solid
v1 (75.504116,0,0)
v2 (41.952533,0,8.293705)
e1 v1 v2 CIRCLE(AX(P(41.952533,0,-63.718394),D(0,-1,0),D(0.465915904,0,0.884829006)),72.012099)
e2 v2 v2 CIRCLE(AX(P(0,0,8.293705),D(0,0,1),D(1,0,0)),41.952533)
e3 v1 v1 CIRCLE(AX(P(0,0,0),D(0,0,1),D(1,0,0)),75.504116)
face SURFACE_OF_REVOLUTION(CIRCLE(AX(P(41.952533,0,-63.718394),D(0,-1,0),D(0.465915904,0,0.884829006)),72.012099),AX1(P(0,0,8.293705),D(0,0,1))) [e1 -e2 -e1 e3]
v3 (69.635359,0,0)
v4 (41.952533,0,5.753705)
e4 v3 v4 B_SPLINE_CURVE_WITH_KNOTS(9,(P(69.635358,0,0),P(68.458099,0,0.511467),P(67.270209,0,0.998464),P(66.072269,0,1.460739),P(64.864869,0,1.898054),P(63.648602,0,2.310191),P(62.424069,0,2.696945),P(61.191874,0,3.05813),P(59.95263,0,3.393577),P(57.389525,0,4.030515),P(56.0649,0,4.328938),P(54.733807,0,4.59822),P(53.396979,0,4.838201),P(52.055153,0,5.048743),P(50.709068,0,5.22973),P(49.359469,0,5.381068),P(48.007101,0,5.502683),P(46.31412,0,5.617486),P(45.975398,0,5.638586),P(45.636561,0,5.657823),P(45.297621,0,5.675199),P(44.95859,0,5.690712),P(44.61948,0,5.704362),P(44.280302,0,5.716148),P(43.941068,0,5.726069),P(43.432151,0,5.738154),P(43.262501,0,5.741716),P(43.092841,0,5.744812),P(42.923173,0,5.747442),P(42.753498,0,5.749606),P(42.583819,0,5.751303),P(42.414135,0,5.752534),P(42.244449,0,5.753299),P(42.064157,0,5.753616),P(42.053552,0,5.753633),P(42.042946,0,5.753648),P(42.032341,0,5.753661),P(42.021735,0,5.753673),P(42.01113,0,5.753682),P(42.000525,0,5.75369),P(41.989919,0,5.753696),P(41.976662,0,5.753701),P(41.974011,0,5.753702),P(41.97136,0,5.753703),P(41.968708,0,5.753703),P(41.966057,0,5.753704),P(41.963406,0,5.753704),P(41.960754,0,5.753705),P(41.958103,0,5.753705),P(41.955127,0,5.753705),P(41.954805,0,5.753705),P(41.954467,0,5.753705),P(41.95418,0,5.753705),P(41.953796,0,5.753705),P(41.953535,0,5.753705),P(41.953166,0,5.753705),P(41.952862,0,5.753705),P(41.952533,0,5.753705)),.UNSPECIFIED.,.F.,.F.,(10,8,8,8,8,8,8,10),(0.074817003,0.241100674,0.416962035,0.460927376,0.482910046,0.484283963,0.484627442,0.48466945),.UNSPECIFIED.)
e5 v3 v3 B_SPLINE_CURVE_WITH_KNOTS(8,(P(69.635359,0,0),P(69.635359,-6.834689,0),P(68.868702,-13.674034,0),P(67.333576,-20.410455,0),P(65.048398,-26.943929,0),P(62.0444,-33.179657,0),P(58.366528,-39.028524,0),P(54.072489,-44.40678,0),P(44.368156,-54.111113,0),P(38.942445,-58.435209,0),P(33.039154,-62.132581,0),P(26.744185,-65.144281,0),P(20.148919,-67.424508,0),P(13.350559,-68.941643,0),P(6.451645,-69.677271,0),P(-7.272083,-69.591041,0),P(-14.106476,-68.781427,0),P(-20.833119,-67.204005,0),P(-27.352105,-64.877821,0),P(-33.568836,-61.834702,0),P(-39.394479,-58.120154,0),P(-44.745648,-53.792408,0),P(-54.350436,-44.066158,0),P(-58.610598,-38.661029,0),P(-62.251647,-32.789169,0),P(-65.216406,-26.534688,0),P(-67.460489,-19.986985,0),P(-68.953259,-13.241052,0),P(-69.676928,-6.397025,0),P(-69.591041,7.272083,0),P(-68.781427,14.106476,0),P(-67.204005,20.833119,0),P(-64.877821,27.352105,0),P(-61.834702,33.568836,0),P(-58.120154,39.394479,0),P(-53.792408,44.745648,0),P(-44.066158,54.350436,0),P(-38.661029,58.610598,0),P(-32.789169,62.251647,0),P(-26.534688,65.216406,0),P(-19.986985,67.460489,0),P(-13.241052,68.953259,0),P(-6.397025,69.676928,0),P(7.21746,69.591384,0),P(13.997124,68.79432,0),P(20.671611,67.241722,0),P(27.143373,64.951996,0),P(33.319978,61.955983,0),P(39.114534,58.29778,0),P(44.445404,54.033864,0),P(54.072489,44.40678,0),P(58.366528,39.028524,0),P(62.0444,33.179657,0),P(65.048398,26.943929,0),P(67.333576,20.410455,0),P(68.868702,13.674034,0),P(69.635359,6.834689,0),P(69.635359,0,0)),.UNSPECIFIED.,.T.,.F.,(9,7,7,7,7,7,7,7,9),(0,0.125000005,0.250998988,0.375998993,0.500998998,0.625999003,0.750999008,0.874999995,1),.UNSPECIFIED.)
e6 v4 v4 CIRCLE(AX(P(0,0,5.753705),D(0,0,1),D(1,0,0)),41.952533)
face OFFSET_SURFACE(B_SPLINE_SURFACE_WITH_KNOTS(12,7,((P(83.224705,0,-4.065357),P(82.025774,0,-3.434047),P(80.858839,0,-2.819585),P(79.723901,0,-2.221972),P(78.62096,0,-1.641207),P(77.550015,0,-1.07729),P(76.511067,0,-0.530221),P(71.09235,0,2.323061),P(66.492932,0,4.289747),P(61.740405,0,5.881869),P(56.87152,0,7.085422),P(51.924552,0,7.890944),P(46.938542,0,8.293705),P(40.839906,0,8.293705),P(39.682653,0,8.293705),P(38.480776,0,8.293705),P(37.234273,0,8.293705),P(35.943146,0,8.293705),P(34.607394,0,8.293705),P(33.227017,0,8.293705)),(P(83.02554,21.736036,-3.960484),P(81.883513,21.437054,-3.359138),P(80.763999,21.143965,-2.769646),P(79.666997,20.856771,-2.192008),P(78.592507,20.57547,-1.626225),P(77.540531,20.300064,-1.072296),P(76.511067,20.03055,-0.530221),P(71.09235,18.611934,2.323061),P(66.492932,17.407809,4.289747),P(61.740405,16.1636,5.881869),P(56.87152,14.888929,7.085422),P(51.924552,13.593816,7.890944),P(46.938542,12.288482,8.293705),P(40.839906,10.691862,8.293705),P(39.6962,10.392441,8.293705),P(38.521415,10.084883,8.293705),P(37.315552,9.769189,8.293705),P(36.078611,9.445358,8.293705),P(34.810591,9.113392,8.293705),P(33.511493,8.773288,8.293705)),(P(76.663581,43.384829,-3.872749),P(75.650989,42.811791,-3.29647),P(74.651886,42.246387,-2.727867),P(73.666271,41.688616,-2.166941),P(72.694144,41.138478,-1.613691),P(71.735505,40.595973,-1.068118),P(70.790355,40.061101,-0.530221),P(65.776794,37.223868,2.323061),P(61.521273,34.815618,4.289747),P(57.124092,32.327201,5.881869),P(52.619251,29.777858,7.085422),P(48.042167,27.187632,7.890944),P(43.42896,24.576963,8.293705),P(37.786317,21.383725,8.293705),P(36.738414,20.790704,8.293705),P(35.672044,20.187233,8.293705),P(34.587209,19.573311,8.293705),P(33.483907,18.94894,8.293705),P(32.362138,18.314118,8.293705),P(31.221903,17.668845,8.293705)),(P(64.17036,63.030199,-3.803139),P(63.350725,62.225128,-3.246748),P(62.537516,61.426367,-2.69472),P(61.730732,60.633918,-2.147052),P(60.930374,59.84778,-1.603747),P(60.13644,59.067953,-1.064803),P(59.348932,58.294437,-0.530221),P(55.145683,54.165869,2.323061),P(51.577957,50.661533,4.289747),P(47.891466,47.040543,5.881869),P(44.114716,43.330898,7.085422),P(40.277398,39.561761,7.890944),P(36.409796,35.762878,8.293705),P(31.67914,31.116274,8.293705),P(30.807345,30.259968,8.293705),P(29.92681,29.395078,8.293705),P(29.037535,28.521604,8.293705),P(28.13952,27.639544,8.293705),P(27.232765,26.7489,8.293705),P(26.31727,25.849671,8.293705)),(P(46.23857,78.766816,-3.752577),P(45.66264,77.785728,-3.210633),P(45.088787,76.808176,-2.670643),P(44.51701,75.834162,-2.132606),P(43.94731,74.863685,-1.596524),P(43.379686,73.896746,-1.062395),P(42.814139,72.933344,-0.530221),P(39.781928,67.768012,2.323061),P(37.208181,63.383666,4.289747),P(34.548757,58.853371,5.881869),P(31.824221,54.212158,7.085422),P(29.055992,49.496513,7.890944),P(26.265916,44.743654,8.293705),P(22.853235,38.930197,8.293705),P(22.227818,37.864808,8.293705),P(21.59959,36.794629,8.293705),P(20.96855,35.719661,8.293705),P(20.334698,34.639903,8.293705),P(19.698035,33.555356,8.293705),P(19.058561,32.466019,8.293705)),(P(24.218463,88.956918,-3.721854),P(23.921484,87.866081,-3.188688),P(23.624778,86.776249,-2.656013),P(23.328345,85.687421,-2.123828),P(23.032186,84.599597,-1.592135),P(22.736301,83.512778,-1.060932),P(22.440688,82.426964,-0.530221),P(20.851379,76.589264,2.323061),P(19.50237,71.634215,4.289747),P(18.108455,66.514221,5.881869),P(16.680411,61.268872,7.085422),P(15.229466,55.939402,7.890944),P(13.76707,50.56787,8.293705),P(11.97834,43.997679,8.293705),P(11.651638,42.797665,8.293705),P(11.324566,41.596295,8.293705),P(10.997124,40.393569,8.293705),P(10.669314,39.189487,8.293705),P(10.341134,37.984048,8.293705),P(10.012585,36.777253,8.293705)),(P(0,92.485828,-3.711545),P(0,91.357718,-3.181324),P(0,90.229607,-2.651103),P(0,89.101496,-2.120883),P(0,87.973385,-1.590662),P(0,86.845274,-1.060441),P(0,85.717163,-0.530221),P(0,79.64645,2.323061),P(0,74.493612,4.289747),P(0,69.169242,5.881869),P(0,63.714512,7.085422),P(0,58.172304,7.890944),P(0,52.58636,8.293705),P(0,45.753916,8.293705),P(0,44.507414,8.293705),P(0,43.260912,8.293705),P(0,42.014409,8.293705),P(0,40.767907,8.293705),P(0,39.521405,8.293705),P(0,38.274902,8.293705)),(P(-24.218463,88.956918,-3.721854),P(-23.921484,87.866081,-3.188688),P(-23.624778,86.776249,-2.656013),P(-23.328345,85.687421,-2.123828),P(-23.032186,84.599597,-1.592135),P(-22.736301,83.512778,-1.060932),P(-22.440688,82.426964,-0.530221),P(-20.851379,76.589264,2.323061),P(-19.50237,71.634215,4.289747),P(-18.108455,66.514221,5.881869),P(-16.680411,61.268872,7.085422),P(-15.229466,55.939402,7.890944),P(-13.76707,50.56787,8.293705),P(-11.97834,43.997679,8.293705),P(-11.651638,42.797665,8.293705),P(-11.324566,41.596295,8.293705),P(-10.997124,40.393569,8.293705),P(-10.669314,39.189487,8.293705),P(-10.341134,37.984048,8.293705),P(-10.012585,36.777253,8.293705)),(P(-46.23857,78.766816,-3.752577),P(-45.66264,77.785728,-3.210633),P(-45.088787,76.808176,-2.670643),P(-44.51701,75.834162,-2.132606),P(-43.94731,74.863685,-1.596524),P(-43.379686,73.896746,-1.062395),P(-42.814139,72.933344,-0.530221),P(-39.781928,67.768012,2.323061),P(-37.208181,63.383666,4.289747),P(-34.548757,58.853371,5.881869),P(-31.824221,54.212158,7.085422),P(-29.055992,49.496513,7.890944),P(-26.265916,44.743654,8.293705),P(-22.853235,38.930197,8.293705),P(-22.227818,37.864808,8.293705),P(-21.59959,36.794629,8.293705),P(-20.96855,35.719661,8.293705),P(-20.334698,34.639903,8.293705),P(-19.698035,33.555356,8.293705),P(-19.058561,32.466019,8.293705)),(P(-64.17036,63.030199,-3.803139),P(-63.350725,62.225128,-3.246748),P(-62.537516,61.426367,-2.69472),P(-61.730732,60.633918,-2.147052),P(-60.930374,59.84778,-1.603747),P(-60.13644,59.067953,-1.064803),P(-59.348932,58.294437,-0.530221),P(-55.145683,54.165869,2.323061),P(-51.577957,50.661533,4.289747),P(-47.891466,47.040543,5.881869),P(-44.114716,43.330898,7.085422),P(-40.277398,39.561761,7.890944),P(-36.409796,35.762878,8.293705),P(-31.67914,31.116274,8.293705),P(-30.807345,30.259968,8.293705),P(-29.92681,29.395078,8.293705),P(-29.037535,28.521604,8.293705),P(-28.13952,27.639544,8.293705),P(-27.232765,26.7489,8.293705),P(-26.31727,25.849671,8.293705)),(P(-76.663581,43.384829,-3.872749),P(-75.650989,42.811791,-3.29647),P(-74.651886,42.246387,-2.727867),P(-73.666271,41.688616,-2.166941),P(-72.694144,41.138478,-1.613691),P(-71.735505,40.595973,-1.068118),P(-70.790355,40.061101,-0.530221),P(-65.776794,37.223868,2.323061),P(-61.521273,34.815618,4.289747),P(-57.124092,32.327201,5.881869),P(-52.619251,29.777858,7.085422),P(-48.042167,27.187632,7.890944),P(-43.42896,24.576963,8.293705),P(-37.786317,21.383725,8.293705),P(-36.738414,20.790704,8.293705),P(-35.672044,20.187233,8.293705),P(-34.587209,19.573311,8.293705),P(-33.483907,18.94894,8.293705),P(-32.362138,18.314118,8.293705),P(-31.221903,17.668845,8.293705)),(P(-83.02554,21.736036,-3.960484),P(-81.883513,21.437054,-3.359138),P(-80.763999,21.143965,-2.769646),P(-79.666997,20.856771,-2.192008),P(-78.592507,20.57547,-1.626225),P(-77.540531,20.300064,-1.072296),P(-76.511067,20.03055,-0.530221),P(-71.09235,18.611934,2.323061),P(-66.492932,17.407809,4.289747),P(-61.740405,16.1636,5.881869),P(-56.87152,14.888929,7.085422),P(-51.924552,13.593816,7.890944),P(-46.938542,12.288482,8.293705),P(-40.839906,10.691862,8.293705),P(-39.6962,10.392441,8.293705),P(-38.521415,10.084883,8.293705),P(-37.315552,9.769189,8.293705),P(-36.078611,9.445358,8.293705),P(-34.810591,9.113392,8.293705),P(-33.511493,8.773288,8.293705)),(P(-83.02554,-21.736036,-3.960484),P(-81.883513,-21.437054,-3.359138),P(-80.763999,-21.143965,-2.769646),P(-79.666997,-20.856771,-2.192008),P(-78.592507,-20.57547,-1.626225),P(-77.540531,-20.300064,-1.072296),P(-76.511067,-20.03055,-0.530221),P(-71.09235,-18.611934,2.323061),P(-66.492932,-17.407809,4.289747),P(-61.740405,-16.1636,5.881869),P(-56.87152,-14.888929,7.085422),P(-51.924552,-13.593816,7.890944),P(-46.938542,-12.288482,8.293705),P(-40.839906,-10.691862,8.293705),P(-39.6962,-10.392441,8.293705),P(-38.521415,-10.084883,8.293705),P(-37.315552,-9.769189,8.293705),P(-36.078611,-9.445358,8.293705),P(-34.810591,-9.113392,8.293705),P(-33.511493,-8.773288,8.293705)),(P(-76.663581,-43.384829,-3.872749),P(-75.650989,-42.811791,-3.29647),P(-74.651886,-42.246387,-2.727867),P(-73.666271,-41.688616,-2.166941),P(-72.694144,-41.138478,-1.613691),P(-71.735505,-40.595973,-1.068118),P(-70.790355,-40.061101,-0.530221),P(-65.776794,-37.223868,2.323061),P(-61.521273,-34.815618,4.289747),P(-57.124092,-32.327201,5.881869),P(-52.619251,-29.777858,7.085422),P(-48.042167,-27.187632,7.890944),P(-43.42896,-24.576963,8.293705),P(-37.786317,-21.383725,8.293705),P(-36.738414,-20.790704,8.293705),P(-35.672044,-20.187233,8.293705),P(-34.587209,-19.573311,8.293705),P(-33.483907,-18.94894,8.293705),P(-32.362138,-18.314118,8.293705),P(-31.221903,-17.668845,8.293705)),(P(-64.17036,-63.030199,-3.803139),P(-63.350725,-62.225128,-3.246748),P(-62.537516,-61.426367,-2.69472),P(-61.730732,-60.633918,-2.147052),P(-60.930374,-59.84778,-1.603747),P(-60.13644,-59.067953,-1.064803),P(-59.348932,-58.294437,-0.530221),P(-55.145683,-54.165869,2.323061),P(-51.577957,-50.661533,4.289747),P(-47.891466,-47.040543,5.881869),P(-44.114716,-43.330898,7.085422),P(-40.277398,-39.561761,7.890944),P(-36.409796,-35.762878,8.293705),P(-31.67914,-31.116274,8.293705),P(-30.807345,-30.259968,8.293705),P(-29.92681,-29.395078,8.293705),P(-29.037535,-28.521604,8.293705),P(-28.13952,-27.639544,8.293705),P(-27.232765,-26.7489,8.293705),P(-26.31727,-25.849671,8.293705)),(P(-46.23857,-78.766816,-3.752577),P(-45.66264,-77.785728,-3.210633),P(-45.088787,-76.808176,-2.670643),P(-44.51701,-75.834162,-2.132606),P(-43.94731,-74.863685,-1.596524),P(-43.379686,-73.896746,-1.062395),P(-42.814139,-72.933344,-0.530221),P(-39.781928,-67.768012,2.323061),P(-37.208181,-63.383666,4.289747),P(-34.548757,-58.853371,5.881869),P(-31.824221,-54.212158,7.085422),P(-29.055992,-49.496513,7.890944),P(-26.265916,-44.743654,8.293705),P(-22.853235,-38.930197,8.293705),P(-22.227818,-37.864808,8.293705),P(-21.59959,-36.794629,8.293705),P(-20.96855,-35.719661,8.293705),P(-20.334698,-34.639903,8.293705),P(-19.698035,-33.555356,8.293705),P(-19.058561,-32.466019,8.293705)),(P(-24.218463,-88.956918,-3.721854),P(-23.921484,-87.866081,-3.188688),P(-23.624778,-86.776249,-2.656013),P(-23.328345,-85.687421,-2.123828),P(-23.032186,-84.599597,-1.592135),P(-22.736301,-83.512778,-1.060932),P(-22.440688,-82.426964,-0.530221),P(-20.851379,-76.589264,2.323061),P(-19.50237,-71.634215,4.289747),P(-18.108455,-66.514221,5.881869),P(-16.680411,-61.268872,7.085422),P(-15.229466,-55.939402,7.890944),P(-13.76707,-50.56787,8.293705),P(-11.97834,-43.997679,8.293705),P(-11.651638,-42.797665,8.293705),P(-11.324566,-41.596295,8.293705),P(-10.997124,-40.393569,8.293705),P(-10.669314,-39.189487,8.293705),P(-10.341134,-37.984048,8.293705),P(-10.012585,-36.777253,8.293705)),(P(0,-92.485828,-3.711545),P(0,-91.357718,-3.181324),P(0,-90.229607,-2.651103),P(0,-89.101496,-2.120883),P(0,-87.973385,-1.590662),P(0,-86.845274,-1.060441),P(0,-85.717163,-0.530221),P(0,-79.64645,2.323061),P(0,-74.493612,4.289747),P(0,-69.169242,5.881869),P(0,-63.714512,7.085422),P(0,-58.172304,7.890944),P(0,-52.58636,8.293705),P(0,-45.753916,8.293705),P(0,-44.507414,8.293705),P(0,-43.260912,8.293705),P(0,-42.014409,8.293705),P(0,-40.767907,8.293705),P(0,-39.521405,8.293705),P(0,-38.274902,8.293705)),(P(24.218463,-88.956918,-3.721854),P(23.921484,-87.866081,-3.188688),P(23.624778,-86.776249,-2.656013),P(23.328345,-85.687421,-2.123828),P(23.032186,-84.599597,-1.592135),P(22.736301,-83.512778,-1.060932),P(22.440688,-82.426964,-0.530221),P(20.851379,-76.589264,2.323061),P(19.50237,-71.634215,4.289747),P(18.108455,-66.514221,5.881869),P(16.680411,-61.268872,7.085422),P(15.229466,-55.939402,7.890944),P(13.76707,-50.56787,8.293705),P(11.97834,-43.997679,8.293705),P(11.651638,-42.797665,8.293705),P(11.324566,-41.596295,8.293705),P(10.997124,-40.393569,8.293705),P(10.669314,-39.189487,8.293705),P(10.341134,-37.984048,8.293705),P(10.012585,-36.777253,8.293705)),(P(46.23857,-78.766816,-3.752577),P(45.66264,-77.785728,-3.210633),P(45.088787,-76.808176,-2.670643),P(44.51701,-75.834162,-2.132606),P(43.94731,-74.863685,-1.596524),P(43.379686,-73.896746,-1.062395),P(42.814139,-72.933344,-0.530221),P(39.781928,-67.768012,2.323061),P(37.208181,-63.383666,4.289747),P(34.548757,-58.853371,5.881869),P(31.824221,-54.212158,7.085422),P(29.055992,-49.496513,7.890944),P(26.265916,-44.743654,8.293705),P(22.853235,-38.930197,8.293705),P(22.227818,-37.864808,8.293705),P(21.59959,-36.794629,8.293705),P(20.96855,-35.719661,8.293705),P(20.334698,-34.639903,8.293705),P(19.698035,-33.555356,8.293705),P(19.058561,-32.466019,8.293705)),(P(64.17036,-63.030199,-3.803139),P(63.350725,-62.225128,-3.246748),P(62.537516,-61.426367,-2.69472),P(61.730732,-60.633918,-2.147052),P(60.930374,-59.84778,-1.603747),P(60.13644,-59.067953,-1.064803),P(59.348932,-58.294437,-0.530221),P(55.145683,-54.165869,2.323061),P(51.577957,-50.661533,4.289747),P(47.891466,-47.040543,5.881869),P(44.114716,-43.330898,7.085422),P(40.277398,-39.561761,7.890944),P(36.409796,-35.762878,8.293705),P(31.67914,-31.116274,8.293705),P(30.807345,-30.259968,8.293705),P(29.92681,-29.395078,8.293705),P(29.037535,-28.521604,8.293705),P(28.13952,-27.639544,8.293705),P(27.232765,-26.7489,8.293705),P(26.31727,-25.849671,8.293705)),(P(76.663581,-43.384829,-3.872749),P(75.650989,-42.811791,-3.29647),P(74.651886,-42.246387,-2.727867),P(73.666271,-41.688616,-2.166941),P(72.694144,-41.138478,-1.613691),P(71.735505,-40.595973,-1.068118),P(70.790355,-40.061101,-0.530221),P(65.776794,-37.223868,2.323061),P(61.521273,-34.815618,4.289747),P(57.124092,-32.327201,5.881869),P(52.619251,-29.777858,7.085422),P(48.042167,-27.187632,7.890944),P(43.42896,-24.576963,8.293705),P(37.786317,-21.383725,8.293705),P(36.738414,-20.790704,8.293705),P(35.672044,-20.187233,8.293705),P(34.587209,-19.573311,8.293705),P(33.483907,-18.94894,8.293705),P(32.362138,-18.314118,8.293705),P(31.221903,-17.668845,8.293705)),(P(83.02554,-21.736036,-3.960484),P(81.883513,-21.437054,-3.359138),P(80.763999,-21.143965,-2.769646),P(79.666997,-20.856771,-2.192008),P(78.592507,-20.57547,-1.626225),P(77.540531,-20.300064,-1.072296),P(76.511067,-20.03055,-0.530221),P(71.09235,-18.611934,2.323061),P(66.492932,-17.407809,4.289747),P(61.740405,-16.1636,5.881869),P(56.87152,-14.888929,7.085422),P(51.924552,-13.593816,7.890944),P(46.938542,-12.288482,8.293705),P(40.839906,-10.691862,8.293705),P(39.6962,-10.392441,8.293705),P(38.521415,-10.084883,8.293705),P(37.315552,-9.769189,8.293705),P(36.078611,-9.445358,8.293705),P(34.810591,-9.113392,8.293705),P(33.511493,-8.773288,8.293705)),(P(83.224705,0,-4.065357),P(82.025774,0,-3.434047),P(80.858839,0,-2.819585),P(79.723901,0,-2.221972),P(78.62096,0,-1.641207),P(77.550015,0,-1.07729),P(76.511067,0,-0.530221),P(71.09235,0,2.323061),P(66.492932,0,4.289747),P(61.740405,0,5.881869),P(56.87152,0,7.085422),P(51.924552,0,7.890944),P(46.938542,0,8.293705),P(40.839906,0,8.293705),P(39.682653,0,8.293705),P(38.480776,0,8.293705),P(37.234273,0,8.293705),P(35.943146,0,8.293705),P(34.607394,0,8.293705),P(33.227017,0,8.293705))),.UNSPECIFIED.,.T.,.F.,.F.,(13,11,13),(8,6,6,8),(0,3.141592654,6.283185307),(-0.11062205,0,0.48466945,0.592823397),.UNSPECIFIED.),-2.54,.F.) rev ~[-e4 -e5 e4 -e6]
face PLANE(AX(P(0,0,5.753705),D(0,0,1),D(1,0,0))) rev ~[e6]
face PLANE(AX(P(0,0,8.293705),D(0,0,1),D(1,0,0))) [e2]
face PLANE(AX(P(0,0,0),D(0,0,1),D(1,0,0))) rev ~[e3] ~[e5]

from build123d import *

# Parameters (mm, degrees)
F0_R     = 75.5041156062
F1_DEPTH = 8.2937050611
F4_T     = -2.54


# Not quite as in the source:
# - a fillet or chamfer that OpenCascade refuses, or shapes differently, is made with other operations: its cross-section is extruded or revolved along the edge and cut away or added


with BuildPart() as f1:
    # F0 (on Top) → F1 (new body)
    with BuildSketch(Plane.XY):
        Circle(F0_R)
    extrude(amount=F1_DEPTH)

    # F3: fillet of radius 72.0120994422 on 1 edges, made by hand

    # F3_s1 → F3_t2 (revolve, cut)
    with BuildSketch(Plane.XZ):
        with BuildLine():
            ThreePointArc((75.5041156062, 0), (59.2332610775, 6.189537281), (41.9525331761, 8.2937050611))
            Line((41.9525331761, 8.2937050611), (41.9525331761, 9.7339470499))
            Line((41.9525331761, 9.7339470499), (75.5041156062, 9.7339470499))
            Line((75.5041156062, 9.7339470499), (76.9443575951, 8.2937050611))
            ThreePointArc((76.9443575951, 8.2937050611), (76.9443575951, 4.1468525305), (76.1751472548, 1.2743678876))
            Line((76.1751472548, 1.2743678876), (75.5041156062, 0))
        make_face()
    revolve(axis=Axis((0, 0, 8.2937050611), (0, 0, 1)), mode=Mode.SUBTRACT)

    # F4
    f4_openings = [f1.faces().sort_by_distance(p)[0] for p in [
        (0, 0, 0),
    ]]
    offset(amount=F4_T, openings=f4_openings)


solid = f1.part
